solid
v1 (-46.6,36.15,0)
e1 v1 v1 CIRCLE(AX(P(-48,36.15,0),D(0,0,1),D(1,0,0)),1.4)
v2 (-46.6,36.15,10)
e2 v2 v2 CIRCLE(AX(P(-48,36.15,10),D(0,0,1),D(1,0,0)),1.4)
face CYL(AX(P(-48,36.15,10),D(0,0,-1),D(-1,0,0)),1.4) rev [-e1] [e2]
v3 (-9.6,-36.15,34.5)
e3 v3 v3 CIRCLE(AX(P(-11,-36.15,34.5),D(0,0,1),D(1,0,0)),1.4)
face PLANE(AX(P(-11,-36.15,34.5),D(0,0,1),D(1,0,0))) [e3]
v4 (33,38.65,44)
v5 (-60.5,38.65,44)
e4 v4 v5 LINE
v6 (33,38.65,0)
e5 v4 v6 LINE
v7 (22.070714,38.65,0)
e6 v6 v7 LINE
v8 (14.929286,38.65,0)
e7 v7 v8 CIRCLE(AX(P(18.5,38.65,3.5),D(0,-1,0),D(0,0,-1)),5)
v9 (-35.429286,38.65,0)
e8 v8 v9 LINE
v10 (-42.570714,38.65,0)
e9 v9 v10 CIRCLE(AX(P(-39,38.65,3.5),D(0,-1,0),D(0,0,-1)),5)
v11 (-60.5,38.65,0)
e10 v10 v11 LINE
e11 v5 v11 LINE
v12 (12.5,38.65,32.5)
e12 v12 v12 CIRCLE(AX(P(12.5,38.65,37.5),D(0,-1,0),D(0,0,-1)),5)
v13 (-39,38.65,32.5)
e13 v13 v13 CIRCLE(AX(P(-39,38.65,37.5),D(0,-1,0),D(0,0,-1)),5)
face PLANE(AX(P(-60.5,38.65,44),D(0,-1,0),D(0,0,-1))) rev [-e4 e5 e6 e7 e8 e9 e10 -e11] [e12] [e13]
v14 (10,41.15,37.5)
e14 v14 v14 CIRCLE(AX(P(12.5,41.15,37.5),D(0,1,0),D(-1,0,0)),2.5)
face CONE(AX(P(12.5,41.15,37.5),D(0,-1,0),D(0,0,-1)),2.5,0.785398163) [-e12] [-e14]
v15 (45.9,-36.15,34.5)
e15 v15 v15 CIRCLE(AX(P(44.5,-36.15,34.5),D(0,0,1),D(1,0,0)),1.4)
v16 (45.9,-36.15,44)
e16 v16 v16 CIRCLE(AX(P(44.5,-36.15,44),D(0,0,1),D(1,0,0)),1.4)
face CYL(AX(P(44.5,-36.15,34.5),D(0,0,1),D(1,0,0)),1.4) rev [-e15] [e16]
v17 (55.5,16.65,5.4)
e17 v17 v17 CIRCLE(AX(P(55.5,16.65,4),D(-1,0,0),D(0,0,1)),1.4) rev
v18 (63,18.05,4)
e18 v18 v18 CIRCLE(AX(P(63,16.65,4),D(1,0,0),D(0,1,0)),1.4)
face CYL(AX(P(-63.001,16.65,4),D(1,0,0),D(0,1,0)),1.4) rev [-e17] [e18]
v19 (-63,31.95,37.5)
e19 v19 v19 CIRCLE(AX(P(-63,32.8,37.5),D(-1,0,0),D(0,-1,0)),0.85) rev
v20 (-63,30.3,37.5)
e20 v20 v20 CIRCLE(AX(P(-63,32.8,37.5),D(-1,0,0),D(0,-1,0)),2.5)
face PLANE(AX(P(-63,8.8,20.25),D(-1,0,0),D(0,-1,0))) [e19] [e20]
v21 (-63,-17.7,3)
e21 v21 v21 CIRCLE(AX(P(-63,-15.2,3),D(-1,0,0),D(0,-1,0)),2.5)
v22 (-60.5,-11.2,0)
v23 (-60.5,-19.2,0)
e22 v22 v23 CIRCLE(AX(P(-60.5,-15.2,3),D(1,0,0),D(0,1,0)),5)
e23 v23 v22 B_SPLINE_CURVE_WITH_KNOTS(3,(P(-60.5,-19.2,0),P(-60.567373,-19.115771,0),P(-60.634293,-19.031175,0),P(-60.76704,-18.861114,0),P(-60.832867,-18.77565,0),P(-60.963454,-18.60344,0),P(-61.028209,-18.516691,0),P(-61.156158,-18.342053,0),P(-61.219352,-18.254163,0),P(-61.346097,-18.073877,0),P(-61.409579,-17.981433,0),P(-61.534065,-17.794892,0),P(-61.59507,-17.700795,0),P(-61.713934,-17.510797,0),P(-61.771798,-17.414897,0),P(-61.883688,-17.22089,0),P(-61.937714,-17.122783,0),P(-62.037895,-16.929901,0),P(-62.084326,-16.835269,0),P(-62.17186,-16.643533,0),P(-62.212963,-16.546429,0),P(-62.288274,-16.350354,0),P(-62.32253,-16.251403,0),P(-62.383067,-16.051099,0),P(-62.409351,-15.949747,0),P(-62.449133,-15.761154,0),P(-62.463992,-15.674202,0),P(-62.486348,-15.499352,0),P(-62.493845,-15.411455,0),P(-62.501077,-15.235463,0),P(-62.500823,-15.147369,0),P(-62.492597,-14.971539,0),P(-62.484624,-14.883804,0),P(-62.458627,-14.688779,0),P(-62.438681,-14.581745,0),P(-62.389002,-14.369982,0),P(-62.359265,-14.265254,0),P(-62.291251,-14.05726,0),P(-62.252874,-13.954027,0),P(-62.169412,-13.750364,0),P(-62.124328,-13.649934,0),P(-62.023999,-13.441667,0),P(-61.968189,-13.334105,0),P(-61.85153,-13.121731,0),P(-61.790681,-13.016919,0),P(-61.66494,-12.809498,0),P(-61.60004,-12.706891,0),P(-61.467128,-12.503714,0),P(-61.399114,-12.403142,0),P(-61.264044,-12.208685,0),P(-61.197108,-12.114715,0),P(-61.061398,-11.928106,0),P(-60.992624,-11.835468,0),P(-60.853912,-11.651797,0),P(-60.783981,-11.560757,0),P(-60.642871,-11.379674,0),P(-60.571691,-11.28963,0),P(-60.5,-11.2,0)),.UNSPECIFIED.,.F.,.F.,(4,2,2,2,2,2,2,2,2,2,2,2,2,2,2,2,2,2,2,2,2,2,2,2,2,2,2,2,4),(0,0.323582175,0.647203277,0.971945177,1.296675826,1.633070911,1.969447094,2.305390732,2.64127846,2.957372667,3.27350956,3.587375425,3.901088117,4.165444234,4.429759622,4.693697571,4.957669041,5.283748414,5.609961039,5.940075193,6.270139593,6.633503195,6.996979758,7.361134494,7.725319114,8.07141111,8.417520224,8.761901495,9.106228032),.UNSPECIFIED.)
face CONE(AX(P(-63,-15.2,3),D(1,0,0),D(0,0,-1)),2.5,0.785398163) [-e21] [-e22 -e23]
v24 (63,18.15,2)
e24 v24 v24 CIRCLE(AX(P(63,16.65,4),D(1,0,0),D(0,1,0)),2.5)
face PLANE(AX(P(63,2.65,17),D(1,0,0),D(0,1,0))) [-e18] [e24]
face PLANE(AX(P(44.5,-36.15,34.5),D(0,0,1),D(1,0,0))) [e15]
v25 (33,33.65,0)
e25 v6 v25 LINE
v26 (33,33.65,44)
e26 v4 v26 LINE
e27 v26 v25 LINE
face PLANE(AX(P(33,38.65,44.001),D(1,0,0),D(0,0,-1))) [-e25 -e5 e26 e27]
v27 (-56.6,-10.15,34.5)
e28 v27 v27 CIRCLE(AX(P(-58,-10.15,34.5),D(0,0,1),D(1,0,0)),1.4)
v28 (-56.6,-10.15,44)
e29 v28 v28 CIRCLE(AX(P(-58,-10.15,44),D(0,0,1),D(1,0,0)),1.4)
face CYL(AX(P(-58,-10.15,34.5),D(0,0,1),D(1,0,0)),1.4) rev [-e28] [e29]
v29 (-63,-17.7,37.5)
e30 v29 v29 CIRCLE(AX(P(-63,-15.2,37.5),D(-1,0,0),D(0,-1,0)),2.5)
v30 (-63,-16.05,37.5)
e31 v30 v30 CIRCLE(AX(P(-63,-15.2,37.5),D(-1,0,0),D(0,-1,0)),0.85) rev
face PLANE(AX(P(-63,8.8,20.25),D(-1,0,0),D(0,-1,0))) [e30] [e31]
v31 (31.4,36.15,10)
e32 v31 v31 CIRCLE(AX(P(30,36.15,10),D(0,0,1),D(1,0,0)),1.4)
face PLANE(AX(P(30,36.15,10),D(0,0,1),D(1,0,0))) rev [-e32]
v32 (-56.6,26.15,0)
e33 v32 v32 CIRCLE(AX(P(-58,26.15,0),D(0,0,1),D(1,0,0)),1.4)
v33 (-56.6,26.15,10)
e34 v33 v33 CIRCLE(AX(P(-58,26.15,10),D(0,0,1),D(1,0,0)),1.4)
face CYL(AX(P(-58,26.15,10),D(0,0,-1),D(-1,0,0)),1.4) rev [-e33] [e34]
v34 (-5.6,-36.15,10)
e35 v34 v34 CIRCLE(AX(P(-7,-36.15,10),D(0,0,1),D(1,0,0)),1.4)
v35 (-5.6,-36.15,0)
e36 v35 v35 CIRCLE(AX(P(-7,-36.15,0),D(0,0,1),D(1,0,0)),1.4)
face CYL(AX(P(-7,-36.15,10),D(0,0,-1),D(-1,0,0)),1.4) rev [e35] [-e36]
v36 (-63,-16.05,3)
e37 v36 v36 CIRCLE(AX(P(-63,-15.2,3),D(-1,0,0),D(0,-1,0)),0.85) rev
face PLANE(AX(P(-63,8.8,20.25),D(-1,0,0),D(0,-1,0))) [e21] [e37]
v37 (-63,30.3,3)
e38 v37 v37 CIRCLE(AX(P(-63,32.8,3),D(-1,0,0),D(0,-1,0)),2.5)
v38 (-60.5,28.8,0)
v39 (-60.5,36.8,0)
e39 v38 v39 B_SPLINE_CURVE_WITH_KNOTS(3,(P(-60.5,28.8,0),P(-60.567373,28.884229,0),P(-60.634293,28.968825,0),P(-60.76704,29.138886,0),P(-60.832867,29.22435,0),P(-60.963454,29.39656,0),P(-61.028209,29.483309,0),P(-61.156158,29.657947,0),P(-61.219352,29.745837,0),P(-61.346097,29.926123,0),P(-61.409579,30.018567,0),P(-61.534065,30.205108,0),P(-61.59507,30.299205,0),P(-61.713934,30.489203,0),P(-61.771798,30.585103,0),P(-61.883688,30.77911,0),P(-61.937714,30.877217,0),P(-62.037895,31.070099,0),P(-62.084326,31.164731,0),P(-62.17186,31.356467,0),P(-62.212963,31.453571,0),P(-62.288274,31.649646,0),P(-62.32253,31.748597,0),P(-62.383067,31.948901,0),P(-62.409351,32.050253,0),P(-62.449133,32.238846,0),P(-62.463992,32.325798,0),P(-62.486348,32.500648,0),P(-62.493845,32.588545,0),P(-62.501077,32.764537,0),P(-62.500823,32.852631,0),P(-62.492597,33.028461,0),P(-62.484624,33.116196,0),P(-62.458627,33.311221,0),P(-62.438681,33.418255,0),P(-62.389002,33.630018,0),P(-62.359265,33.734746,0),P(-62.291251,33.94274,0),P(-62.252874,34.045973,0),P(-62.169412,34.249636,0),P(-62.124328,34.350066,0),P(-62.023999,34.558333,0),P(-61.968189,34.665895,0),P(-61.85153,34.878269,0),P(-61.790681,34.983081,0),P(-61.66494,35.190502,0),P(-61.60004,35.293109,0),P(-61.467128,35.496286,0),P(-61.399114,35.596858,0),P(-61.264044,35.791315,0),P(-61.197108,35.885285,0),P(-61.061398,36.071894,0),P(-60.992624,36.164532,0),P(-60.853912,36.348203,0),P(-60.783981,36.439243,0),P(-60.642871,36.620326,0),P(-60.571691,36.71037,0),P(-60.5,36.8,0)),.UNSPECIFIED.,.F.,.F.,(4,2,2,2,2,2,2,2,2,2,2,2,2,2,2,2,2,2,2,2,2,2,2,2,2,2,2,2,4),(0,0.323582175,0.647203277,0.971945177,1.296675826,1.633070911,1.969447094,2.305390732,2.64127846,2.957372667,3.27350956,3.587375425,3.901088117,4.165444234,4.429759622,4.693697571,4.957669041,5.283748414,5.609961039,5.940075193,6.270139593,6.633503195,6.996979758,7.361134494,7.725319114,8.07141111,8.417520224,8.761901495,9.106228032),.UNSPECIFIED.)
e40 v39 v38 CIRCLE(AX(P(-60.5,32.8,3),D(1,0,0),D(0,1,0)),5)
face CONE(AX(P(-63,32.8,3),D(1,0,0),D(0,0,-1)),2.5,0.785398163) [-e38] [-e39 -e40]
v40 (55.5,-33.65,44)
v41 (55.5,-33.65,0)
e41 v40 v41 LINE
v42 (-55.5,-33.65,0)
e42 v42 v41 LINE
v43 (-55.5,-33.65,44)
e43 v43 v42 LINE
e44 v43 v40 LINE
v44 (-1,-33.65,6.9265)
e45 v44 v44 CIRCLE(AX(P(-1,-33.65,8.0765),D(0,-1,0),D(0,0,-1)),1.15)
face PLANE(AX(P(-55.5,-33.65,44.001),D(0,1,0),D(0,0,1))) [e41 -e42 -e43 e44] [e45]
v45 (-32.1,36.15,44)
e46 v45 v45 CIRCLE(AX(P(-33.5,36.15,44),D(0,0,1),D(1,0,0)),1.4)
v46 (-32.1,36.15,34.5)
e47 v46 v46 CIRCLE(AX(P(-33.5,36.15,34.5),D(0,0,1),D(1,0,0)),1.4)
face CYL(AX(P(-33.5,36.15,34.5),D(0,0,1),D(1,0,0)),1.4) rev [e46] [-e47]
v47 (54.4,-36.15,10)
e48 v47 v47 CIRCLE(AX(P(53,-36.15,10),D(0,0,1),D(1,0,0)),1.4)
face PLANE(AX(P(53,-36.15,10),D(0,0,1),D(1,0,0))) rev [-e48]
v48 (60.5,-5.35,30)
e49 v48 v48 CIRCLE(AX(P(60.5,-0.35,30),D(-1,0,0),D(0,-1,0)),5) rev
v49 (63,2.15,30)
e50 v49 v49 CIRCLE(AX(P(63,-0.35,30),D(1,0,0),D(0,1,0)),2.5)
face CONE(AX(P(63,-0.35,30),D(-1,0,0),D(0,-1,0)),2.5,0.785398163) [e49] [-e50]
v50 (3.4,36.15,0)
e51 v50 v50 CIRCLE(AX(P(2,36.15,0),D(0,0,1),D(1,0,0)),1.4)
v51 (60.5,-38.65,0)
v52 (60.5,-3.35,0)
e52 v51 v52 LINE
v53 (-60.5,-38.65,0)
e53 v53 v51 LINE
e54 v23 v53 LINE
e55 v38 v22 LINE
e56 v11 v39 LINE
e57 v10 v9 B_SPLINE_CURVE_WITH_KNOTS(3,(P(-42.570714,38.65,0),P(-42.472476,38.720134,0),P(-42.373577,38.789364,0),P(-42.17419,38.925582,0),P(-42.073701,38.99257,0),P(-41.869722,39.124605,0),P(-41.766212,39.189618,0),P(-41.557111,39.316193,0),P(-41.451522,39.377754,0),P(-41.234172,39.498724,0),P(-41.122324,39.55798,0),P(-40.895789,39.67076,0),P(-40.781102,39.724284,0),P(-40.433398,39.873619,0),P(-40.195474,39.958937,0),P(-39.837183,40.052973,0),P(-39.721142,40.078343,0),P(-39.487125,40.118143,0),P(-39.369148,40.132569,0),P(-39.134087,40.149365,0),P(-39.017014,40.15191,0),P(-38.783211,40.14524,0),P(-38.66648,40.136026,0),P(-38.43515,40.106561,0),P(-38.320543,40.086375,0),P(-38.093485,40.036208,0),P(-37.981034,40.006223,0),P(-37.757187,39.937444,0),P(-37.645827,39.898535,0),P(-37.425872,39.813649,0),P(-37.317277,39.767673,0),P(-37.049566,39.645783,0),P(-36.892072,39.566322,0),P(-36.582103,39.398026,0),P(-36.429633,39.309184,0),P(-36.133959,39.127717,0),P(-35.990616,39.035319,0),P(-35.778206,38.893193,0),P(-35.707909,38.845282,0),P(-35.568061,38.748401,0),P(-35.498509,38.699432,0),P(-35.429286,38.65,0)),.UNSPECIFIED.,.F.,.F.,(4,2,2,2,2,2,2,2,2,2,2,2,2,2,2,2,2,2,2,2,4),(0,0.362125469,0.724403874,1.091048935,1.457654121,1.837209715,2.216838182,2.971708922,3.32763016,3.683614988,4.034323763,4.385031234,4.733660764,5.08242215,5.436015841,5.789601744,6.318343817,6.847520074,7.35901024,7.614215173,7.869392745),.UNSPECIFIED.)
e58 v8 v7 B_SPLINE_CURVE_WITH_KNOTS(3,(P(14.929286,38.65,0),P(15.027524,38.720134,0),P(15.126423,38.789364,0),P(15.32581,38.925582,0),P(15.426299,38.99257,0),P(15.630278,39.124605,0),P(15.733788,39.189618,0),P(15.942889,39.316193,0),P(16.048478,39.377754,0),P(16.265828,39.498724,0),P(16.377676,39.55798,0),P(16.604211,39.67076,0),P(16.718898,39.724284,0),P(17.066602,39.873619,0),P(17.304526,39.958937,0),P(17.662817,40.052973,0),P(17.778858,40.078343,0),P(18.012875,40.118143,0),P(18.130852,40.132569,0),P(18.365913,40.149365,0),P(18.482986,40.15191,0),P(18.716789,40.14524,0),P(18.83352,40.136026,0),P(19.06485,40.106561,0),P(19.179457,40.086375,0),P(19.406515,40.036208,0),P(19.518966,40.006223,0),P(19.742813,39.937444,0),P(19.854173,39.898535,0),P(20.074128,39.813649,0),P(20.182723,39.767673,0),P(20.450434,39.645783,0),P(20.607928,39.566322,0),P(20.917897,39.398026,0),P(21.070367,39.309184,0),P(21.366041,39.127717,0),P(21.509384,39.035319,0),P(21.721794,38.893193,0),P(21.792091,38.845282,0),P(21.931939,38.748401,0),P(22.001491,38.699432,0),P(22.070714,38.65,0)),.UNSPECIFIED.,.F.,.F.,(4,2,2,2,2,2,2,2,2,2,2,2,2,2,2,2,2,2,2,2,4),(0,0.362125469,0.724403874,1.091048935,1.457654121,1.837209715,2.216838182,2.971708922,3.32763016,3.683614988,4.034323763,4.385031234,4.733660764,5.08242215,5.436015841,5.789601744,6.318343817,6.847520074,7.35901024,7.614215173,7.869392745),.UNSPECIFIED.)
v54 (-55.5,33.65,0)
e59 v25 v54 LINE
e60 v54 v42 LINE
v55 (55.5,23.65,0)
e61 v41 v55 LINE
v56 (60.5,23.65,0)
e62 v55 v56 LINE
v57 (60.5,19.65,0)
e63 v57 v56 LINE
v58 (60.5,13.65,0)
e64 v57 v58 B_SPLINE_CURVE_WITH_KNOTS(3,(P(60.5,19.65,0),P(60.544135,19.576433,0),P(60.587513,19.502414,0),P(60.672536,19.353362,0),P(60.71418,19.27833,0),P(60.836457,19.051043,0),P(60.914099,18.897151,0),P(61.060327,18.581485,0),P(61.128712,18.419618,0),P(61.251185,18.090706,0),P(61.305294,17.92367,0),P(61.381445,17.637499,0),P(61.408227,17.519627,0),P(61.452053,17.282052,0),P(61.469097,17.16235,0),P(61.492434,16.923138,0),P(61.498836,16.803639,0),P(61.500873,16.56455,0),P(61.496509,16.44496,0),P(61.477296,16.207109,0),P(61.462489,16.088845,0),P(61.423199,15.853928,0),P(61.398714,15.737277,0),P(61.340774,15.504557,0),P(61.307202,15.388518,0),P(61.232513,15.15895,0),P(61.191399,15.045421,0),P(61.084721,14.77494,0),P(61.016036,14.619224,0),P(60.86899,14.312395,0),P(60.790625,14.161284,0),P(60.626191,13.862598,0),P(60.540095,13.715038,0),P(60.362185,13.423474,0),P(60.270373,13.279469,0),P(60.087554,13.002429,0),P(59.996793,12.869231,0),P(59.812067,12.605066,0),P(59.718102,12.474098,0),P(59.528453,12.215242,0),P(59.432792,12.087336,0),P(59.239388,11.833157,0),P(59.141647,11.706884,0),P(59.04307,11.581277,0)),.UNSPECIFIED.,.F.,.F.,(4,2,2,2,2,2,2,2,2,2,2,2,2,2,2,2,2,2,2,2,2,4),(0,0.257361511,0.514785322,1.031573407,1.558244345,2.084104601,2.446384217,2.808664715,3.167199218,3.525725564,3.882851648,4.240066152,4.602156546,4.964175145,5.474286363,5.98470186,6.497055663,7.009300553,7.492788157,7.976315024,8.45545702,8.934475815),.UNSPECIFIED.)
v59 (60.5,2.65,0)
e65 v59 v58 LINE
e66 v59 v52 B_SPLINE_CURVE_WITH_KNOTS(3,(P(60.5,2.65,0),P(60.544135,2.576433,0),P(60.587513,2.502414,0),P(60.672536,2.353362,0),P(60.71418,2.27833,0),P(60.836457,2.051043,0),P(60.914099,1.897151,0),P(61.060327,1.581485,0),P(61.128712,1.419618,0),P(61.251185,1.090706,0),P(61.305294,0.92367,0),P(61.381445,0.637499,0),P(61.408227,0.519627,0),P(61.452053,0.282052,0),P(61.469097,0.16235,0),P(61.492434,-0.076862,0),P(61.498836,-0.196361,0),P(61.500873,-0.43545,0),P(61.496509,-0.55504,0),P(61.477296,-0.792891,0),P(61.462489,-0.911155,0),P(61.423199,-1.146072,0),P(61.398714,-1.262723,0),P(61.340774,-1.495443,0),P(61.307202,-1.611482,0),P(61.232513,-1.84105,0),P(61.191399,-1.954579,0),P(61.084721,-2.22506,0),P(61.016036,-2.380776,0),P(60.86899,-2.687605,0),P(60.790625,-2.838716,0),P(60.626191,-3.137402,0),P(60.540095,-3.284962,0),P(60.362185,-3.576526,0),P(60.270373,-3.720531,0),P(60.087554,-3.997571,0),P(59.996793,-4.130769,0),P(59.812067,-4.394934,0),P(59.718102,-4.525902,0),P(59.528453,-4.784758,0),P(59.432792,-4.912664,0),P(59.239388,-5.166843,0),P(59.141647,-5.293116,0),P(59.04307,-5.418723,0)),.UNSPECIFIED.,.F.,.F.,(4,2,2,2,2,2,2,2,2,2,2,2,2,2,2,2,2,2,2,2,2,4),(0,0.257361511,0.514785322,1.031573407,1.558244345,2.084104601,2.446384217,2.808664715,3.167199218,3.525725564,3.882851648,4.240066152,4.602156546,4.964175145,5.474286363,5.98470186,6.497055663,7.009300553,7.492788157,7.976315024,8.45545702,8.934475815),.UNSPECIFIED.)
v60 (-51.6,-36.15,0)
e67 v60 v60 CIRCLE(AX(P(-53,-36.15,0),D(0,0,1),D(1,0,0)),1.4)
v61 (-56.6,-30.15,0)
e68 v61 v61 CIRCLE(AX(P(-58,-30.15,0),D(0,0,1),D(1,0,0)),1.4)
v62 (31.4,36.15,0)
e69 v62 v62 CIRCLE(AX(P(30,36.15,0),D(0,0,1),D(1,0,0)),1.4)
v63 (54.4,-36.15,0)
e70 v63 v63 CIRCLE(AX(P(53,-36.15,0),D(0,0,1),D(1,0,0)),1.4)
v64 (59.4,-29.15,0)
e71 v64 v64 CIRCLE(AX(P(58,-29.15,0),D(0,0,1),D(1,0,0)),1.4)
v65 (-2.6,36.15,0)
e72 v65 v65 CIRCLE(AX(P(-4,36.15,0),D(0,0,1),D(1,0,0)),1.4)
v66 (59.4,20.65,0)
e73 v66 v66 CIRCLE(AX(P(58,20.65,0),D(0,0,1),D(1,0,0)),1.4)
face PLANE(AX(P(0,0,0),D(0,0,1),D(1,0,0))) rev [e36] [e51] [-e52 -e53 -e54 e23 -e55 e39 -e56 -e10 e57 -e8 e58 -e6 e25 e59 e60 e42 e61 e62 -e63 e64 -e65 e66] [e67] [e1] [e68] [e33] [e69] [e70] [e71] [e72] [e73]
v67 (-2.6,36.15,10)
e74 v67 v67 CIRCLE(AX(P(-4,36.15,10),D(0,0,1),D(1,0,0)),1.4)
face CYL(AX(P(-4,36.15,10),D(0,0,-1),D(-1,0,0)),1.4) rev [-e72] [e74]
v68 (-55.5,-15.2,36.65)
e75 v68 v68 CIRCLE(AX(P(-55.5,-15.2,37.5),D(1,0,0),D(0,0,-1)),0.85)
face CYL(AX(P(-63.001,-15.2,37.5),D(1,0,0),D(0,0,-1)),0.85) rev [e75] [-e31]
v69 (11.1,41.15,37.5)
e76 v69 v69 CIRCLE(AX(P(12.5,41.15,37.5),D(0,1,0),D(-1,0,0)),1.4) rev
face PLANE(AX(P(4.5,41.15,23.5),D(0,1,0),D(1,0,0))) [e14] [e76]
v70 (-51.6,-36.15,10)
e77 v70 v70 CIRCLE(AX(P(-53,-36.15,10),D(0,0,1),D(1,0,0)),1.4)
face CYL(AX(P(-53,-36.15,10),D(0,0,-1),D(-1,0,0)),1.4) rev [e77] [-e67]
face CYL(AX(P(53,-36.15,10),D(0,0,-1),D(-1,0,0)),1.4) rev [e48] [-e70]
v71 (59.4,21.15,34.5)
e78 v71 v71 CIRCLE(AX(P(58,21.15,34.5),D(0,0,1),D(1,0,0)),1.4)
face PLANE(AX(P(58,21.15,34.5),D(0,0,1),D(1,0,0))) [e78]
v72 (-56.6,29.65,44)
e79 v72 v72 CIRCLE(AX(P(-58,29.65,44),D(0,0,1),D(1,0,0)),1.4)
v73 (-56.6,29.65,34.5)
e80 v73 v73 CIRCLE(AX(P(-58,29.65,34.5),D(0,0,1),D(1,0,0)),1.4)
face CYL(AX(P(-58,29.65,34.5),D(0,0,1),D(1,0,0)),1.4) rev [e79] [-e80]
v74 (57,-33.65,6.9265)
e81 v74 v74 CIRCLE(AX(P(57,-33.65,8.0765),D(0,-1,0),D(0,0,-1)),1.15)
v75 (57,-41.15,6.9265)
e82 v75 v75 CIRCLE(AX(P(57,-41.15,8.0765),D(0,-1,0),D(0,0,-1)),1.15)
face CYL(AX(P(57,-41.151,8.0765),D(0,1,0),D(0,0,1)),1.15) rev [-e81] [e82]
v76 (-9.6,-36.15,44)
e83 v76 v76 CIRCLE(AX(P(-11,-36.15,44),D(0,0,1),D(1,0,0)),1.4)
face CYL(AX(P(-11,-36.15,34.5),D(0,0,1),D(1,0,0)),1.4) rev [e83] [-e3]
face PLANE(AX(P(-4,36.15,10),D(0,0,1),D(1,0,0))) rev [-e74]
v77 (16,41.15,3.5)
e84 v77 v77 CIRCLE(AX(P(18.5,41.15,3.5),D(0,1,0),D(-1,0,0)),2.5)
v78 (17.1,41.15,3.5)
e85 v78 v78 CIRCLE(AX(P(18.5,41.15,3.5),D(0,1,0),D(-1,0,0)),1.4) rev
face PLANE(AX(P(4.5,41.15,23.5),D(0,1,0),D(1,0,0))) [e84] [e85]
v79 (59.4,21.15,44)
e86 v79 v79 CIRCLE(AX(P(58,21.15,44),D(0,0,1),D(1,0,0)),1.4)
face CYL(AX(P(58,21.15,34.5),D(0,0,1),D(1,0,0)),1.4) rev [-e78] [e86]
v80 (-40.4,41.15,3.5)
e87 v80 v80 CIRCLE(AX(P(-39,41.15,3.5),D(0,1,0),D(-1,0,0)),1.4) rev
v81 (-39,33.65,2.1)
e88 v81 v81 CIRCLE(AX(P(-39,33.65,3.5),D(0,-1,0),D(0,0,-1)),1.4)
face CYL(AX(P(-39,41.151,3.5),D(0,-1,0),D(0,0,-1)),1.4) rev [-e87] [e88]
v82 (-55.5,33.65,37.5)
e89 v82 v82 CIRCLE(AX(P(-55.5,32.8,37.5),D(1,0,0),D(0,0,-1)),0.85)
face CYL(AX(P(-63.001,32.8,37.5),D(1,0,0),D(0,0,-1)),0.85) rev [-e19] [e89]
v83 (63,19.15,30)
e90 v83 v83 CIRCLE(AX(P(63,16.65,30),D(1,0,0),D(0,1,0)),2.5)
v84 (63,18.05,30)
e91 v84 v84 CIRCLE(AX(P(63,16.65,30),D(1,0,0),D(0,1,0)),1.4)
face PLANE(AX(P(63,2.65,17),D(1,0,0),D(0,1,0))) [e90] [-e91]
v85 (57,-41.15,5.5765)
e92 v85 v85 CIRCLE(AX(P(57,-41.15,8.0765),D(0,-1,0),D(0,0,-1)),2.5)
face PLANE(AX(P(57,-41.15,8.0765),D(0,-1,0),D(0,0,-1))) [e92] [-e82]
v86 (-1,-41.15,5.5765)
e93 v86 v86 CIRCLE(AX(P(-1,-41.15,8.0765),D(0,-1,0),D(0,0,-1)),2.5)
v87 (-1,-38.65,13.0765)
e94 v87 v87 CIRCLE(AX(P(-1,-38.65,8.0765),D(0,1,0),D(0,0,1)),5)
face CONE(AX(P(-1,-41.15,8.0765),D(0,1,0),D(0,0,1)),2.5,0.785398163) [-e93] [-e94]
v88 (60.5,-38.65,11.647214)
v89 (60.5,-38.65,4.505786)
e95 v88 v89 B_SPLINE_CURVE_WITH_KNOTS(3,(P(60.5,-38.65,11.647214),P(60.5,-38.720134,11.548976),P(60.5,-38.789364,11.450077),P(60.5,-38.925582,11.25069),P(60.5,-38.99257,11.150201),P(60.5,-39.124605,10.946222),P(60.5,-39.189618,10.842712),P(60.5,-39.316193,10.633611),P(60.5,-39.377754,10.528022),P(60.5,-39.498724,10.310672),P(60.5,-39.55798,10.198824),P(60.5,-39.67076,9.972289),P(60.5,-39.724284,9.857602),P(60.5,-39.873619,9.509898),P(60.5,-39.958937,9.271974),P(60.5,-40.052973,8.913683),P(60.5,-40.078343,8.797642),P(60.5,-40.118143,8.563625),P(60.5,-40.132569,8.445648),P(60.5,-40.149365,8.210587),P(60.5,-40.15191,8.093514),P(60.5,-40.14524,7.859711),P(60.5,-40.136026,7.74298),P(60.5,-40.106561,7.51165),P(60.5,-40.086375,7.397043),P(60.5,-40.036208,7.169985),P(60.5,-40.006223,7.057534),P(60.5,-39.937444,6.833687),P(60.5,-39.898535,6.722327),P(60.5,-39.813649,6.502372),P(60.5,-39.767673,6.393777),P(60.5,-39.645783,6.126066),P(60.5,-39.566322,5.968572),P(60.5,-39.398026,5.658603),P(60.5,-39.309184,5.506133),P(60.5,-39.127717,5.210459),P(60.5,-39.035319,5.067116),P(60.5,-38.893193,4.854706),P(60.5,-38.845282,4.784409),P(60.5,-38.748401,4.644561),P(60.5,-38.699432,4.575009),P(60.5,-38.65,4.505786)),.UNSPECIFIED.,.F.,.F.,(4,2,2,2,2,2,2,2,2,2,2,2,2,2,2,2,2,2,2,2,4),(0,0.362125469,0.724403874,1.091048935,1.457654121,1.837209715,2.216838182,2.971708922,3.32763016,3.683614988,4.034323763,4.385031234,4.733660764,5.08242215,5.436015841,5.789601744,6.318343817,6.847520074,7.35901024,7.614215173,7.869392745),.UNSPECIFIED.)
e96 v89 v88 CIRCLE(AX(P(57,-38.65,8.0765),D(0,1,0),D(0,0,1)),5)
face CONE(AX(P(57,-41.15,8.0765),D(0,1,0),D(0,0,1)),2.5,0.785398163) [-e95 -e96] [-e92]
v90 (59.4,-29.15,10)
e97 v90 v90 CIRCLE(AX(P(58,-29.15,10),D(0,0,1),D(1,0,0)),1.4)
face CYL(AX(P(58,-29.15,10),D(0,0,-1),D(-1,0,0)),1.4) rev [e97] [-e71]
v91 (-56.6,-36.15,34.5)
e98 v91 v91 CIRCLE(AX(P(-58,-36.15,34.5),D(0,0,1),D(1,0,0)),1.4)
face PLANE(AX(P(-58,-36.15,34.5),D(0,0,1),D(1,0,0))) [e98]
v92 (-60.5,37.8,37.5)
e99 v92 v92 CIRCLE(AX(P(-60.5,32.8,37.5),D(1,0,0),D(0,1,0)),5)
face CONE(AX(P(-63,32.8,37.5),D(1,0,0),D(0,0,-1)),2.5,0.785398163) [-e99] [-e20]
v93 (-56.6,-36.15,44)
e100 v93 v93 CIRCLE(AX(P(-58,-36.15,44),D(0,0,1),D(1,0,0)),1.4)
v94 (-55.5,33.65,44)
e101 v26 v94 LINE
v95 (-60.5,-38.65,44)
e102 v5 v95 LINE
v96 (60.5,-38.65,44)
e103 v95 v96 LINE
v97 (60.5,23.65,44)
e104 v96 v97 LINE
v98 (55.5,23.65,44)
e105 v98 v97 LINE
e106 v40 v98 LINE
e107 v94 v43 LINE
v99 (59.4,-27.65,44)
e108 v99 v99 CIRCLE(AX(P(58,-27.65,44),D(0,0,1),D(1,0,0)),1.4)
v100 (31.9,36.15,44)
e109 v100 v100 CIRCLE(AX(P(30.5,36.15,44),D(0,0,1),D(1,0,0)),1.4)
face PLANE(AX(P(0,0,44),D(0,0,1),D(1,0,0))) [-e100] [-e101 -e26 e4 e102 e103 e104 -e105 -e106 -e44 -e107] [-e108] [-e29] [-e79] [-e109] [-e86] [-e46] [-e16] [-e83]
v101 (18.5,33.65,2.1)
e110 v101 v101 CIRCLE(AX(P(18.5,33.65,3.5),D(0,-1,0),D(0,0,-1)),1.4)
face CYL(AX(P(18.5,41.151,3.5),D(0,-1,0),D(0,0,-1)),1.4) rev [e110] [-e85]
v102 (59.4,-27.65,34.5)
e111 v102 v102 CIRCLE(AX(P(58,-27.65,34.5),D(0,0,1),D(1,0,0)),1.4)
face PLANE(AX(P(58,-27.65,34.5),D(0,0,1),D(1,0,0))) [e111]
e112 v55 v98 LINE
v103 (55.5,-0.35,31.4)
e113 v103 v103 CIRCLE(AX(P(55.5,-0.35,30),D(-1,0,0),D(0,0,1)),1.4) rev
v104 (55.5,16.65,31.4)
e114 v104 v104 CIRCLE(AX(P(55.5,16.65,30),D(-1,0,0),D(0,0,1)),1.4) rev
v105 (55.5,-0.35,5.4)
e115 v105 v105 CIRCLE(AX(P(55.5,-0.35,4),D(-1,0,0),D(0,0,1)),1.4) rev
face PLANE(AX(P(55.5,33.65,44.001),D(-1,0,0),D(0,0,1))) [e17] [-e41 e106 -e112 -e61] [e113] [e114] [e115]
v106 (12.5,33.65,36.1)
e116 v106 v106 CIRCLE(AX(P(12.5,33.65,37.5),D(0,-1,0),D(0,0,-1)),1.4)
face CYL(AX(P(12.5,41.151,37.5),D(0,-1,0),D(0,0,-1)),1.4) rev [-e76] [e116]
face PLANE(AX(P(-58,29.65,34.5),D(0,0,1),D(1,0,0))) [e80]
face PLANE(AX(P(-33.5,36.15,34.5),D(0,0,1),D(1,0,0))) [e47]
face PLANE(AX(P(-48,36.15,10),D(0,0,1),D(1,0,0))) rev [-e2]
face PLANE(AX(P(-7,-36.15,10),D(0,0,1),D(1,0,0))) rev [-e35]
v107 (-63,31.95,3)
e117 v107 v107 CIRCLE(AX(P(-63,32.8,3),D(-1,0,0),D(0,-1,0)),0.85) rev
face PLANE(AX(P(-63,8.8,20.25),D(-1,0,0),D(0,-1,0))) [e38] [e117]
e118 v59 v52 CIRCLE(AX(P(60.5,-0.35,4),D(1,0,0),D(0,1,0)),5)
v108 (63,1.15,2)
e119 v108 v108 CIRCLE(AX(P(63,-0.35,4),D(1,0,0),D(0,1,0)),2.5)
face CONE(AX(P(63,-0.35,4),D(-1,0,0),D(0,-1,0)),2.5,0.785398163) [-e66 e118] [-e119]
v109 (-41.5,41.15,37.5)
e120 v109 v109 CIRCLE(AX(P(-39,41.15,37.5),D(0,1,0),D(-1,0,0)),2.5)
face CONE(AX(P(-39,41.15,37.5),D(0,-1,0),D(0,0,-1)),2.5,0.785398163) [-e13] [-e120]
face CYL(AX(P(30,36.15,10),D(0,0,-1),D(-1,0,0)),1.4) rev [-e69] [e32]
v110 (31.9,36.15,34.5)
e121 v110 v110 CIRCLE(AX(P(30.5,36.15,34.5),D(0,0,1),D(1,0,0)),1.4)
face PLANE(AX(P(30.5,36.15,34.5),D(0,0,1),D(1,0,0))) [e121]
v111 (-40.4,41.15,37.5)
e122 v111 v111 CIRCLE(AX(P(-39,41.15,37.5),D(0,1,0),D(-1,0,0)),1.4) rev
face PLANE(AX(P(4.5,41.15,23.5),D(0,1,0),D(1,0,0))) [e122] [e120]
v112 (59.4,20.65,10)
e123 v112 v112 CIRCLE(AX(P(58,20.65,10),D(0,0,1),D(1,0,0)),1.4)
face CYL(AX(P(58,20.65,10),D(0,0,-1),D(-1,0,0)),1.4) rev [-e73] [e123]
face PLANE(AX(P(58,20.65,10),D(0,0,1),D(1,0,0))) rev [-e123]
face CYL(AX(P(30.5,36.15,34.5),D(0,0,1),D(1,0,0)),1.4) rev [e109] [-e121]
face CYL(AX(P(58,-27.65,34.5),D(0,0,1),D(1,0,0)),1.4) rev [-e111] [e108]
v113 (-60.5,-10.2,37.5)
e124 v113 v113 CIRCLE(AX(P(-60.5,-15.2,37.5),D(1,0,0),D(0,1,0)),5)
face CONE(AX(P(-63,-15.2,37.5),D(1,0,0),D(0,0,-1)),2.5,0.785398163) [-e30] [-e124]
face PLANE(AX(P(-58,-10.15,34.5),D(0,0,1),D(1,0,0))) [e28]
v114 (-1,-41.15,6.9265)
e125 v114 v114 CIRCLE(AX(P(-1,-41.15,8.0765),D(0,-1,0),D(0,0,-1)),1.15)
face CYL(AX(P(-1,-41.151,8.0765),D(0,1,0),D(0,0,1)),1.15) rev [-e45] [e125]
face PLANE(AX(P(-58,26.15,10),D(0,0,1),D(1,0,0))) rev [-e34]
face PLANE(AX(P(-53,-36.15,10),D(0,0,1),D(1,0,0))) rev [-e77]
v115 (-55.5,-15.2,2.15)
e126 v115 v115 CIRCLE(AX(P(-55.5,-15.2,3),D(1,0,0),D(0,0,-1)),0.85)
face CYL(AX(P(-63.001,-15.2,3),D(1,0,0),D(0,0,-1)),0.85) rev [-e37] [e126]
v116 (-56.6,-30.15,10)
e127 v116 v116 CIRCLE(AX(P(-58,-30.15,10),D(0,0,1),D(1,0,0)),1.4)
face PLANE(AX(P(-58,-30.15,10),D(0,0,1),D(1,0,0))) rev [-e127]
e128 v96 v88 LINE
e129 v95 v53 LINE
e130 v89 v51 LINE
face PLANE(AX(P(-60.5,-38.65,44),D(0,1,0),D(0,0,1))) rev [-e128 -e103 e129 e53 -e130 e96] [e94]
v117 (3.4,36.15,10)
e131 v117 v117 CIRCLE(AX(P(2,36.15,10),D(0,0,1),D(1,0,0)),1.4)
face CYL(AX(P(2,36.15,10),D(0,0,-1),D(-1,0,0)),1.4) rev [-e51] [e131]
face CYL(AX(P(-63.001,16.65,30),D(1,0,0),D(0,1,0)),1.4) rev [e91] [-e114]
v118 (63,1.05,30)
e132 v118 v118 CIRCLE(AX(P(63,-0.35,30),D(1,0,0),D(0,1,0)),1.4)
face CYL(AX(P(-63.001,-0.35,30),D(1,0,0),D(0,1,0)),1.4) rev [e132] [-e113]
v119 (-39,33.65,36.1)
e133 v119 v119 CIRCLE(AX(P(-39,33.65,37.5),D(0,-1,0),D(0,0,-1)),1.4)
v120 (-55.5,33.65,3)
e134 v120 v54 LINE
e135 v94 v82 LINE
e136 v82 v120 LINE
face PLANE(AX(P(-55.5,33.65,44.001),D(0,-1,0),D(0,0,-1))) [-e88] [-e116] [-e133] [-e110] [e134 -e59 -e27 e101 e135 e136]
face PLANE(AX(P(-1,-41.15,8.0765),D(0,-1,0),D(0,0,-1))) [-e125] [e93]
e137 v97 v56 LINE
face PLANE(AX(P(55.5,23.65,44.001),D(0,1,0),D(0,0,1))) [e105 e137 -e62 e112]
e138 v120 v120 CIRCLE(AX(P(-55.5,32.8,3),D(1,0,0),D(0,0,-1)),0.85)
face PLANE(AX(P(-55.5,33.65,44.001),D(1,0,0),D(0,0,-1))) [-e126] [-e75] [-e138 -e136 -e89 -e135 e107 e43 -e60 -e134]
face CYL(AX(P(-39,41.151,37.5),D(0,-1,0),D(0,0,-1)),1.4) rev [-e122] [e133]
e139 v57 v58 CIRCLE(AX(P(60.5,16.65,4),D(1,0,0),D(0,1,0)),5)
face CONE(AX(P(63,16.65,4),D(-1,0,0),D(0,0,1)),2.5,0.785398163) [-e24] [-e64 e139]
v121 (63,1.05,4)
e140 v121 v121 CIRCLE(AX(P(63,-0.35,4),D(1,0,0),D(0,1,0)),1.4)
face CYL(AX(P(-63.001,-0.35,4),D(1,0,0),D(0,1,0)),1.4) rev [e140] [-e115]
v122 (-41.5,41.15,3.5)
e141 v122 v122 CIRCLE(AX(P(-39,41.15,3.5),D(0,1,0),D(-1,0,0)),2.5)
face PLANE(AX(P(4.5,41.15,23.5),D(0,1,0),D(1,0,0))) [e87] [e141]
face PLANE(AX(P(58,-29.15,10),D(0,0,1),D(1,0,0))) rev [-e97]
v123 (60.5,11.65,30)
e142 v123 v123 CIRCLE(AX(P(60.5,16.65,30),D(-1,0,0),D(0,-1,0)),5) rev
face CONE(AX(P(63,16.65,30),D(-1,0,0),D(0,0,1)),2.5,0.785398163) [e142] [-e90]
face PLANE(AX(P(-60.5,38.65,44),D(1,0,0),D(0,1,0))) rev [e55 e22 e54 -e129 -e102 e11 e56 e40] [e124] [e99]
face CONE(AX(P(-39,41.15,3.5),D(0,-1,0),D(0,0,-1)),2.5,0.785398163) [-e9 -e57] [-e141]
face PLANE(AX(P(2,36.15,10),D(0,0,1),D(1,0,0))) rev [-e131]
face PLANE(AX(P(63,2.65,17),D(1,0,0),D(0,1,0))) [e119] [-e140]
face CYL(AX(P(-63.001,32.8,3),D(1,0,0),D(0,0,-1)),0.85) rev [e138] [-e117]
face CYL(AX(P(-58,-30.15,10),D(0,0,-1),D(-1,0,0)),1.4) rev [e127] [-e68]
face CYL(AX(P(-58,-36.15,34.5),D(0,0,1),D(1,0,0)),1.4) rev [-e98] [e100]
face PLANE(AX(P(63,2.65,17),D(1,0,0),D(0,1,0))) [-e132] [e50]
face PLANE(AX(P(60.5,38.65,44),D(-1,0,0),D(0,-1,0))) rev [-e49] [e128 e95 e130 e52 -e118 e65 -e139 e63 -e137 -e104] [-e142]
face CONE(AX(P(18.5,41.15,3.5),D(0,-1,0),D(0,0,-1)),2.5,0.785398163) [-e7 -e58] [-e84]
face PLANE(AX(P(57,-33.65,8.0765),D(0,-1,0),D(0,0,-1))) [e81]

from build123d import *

# Parameters (mm, degrees)
SKETCH1_W                  = 121
SKETCH1_H                  = 77.3
BOX_DEPTH                  = 44
CUTOUT_REACH               = 86.203
SKETCH2_W                  = 111
SKETCH2_H                  = 67.3
TRIM_REACH                 = 86.203
SKETCH4_R                  = 1.4
TOP_SCREWS_DEPTH           = 9.5
SKETCH7_R                  = 2.5
USB_POWER_BOSS_DEPTH       = 2.5
CHAMFER2_SIZE              = 2.5
USB_POWER_SCREWS_REACH     = 131.945
SKETCH8_R                  = 0.85
SKETCH9_R                  = 2.5
MOTOR_DRIVERS_BOSS_DEPTH   = 2.5
CHAMFER3_SIZE              = 2.5
MOTOR_DRIVERS_SCREWS_REACH = 107.51
SKETCH11_R                 = 1.4
SKETCH12_R                 = 2.5
BOSS_EXTRUDE5_DEPTH        = 2.5
CUT_EXTRUDE8_REACH         = 109.238
SKETCH13_R                 = 1.15
CHAMFER4_SIZE              = 2.5
SKETCH14_R                 = 1.4
CHASSIS_SCREWS_DEPTH       = 10
SKETCH15_R                 = 5
LDS_ADAPTER_BOARD_DEPTH    = 2.5
CUT_EXTRUDE10_REACH        = 141.661
SKETCH16_R                 = 1.4


with BuildPart() as part:
    # Sketch1 → Box (new body)
    with BuildSketch(Plane.XY):
        Rectangle(SKETCH1_W, SKETCH1_H)
    extrude(amount=BOX_DEPTH)

    # Sketch2 → Cutout (cut, up to next)
    with BuildSketch(Plane.XY, mode=Mode.PRIVATE) as cutout_sk1:
        Rectangle(SKETCH2_W, SKETCH2_H)
    cutout_tool1 = extrude(cutout_sk1.sketch, amount=CUTOUT_REACH, mode=Mode.PRIVATE) & part.part
    add(cutout_tool1.solids().sort_by_distance((0, 0, 0))[0], mode=Mode.SUBTRACT)

    # Sketch3 → Trim (cut, up to next)
    with BuildSketch(Plane.XY, mode=Mode.PRIVATE) as trim_sk1:
        Polygon((33, 38.65), (33, 33.65), (55.5, 23.65), (60.5, 23.65), (60.5, 38.65), align=None)
    trim_tool1 = extrude(trim_sk1.sketch, amount=TRIM_REACH, mode=Mode.PRIVATE) & part.part
    add(trim_tool1.solids().sort_by_distance((49.09375, 32.7125, 0))[0], mode=Mode.SUBTRACT)

    # Sketch4 → Top screws (cut)
    with BuildSketch(Plane.XY.offset(44)):
        with Locations((-58, -36.15)):
            Circle(SKETCH4_R)
        with Locations((58, -27.65)):
            Circle(SKETCH4_R)
        with Locations((-11, -36.15)):
            Circle(SKETCH4_R)
        with Locations((-58, 29.65)):
            Circle(SKETCH4_R)
        with Locations((-33.5, 36.15)):
            Circle(SKETCH4_R)
        with Locations((30.5, 36.15)):
            Circle(SKETCH4_R)
        with Locations((58, 21.15)):
            Circle(SKETCH4_R)
        with Locations((44.5, -36.15)):
            Circle(SKETCH4_R)
        with Locations((-58, -10.15)):
            Circle(SKETCH4_R)
    extrude(amount=-TOP_SCREWS_DEPTH, mode=Mode.SUBTRACT)

    # Sketch7 → USB power boss (add)
    with BuildSketch(Plane.ZY.offset(60.5)):
        with Locations(Location((3, 32.8, 0), (0, 0, 90))):
            Circle(SKETCH7_R)
        with Locations(Location((37.5, 32.8, 0), (0, 0, 90))):
            Circle(SKETCH7_R)
        with Locations(Location((3, -15.2, 0), (0, 0, 90))):
            Circle(SKETCH7_R)
        with Locations(Location((37.5, -15.2, 0), (0, 0, 90))):
            Circle(SKETCH7_R)
    extrude(amount=USB_POWER_BOSS_DEPTH)

    # Chamfer2
    # the kernel refuses this chamfer: 2.5 mm, written as the material it adds along each edge
    with BuildSketch(Plane(origin=(-60.5, 32.8, 3), x_dir=(0, 1, 0), z_dir=(0, 0, 1))) as chamfer2_piece_1_section:
        Polygon((2.5 + CHAMFER2_SIZE, 0), (2.5, CHAMFER2_SIZE), (2.5, 0), align=None)
    chamfer2_piece_1 = revolve(axis=Axis((-60.5, 32.8, 3), (-1, 0, 0)), mode=Mode.PRIVATE)
    chamfer2_piece_1 = split(chamfer2_piece_1, bisect_by=Plane(origin=(-60.5, 32.8, 0), z_dir=(0, 0, 1)), keep=Keep.TOP, mode=Mode.PRIVATE)
    chamfer2_piece_1 = split(chamfer2_piece_1, bisect_by=Plane(origin=(-63, 32.8, 3), z_dir=(1, 0, 0)), keep=Keep.TOP, mode=Mode.PRIVATE)
    add(chamfer2_piece_1)
    with BuildSketch(Plane(origin=(-60.5, 32.8, 37.5), x_dir=(0, 1, 0), z_dir=(0, 0, 1))) as chamfer2_piece_2_section:
        Polygon((2.5 + CHAMFER2_SIZE, 0), (2.5, CHAMFER2_SIZE), (2.5, 0), align=None)
    chamfer2_piece_2 = revolve(axis=Axis((-60.5, 32.8, 37.5), (-1, 0, 0)), mode=Mode.PRIVATE)
    chamfer2_piece_2 = split(chamfer2_piece_2, bisect_by=Plane(origin=(-63, 32.8, 37.5), z_dir=(1, 0, 0)), keep=Keep.TOP, mode=Mode.PRIVATE)
    add(chamfer2_piece_2)
    with BuildSketch(Plane(origin=(-60.5, -15.2, 3), x_dir=(0, 1, 0), z_dir=(0, 0, 1))) as chamfer2_piece_3_section:
        Polygon((2.5 + CHAMFER2_SIZE, 0), (2.5, CHAMFER2_SIZE), (2.5, 0), align=None)
    chamfer2_piece_3 = revolve(axis=Axis((-60.5, -15.2, 3), (-1, 0, 0)), mode=Mode.PRIVATE)
    chamfer2_piece_3 = split(chamfer2_piece_3, bisect_by=Plane(origin=(-60.5, -15.2, 0), z_dir=(0, 0, 1)), keep=Keep.TOP, mode=Mode.PRIVATE)
    chamfer2_piece_3 = split(chamfer2_piece_3, bisect_by=Plane(origin=(-63, -15.2, 3), z_dir=(1, 0, 0)), keep=Keep.TOP, mode=Mode.PRIVATE)
    add(chamfer2_piece_3)
    with BuildSketch(Plane(origin=(-60.5, -15.2, 37.5), x_dir=(0, 1, 0), z_dir=(0, 0, 1))) as chamfer2_piece_4_section:
        Polygon((2.5 + CHAMFER2_SIZE, 0), (2.5, CHAMFER2_SIZE), (2.5, 0), align=None)
    chamfer2_piece_4 = revolve(axis=Axis((-60.5, -15.2, 37.5), (-1, 0, 0)), mode=Mode.PRIVATE)
    chamfer2_piece_4 = split(chamfer2_piece_4, bisect_by=Plane(origin=(-63, -15.2, 37.5), z_dir=(1, 0, 0)), keep=Keep.TOP, mode=Mode.PRIVATE)
    add(chamfer2_piece_4)

    # Sketch8 → USB power screws (cut, up to next)
    with BuildSketch(Plane(origin=(-55.5, 0, 0), x_dir=(0, 0, -1), z_dir=(1, 0, 0)), mode=Mode.PRIVATE) as usb_power_screws_sk1:
        with Locations((-3, -15.2)):
            Circle(SKETCH8_R)
    usb_power_screws_tool1 = extrude(usb_power_screws_sk1.sketch, amount=-USB_POWER_SCREWS_REACH, mode=Mode.PRIVATE) & part.part
    # Sketch8 → USB power screws (cut, up to next)
    with BuildSketch(Plane(origin=(-55.5, 0, 0), x_dir=(0, 0, -1), z_dir=(1, 0, 0)), mode=Mode.PRIVATE) as usb_power_screws_sk2:
        with Locations((-37.5, -15.2)):
            Circle(SKETCH8_R)
    usb_power_screws_tool2 = extrude(usb_power_screws_sk2.sketch, amount=-USB_POWER_SCREWS_REACH, mode=Mode.PRIVATE) & part.part
    # Sketch8 → USB power screws (cut, up to next)
    with BuildSketch(Plane(origin=(-55.5, 0, 0), x_dir=(0, 0, -1), z_dir=(1, 0, 0)), mode=Mode.PRIVATE) as usb_power_screws_sk3:
        with Locations(Location((-3, 32.8, 0), (0, 0, 90))):
            Circle(SKETCH8_R)
    usb_power_screws_tool3 = extrude(usb_power_screws_sk3.sketch, amount=-USB_POWER_SCREWS_REACH, mode=Mode.PRIVATE) & part.part
    # Sketch8 → USB power screws (cut, up to next)
    with BuildSketch(Plane(origin=(-55.5, 0, 0), x_dir=(0, 0, -1), z_dir=(1, 0, 0)), mode=Mode.PRIVATE) as usb_power_screws_sk4:
        with Locations(Location((-37.5, 32.8, 0), (0, 0, 90))):
            Circle(SKETCH8_R)
    usb_power_screws_tool4 = extrude(usb_power_screws_sk4.sketch, amount=-USB_POWER_SCREWS_REACH, mode=Mode.PRIVATE) & part.part
    add(usb_power_screws_tool1.solids().sort_by_distance((-55.5, -15.2, 3))[0], mode=Mode.SUBTRACT)
    add(usb_power_screws_tool2.solids().sort_by_distance((-55.5, -15.2, 37.5))[0], mode=Mode.SUBTRACT)
    add(usb_power_screws_tool3.solids().sort_by_distance((-55.5, 32.8, 3))[0], mode=Mode.SUBTRACT)
    add(usb_power_screws_tool4.solids().sort_by_distance((-55.5, 32.8, 37.5))[0], mode=Mode.SUBTRACT)

    # Sketch9 → Motor drivers boss (add)
    with BuildSketch(Plane(origin=(0, 38.65, 0), x_dir=(1, 0, 0), z_dir=(0, 1, 0))):
        with Locations(Location((-39, -37.5, 0), (0, 0, 90))):
            Circle(SKETCH9_R)
        with Locations(Location((-39, -3.5, 0), (0, 0, 90))):
            Circle(SKETCH9_R)
        with Locations(Location((18.5, -3.5, 0), (0, 0, 90))):
            Circle(SKETCH9_R)
        with Locations(Location((12.5, -37.5, 0), (0, 0, 90))):
            Circle(SKETCH9_R)
    extrude(amount=MOTOR_DRIVERS_BOSS_DEPTH)

    # Chamfer3
    # the kernel refuses this chamfer: 2.5 mm, written as the material it adds along each edge
    with BuildSketch(Plane(origin=(-39, 38.65, 37.5), x_dir=(0, 0, -1), z_dir=(1, 0, 0))) as chamfer3_piece_1_section:
        Polygon((2.5 + CHAMFER3_SIZE, 0), (2.5, CHAMFER3_SIZE), (2.5, 0), align=None)
    chamfer3_piece_1 = revolve(axis=Axis((-39, 38.65, 37.5), (0, 1, 0)), mode=Mode.PRIVATE)
    chamfer3_piece_1 = split(chamfer3_piece_1, bisect_by=Plane(origin=(-39, 41.15, 37.5), z_dir=(0, -1, 0)), keep=Keep.TOP, mode=Mode.PRIVATE)
    add(chamfer3_piece_1)
    with BuildSketch(Plane(origin=(-39, 38.65, 3.5), x_dir=(0, 0, -1), z_dir=(1, 0, 0))) as chamfer3_piece_2_section:
        Polygon((2.5 + CHAMFER3_SIZE, 0), (2.5, CHAMFER3_SIZE), (2.5, 0), align=None)
    chamfer3_piece_2 = revolve(axis=Axis((-39, 38.65, 3.5), (0, 1, 0)), mode=Mode.PRIVATE)
    chamfer3_piece_2 = split(chamfer3_piece_2, bisect_by=Plane(origin=(-39, 38.65, 0), z_dir=(0, 0, 1)), keep=Keep.TOP, mode=Mode.PRIVATE)
    chamfer3_piece_2 = split(chamfer3_piece_2, bisect_by=Plane(origin=(-39, 41.15, 3.5), z_dir=(0, -1, 0)), keep=Keep.TOP, mode=Mode.PRIVATE)
    add(chamfer3_piece_2)
    with BuildSketch(Plane(origin=(18.5, 38.65, 3.5), x_dir=(0, 0, -1), z_dir=(1, 0, 0))) as chamfer3_piece_3_section:
        Polygon((2.5 + CHAMFER3_SIZE, 0), (2.5, CHAMFER3_SIZE), (2.5, 0), align=None)
    chamfer3_piece_3 = revolve(axis=Axis((18.5, 38.65, 3.5), (0, 1, 0)), mode=Mode.PRIVATE)
    chamfer3_piece_3 = split(chamfer3_piece_3, bisect_by=Plane(origin=(18.5, 38.65, 0), z_dir=(0, 0, 1)), keep=Keep.TOP, mode=Mode.PRIVATE)
    chamfer3_piece_3 = split(chamfer3_piece_3, bisect_by=Plane(origin=(18.5, 41.15, 3.5), z_dir=(0, -1, 0)), keep=Keep.TOP, mode=Mode.PRIVATE)
    add(chamfer3_piece_3)
    with BuildSketch(Plane(origin=(12.5, 38.65, 37.5), x_dir=(0, 0, -1), z_dir=(1, 0, 0))) as chamfer3_piece_4_section:
        Polygon((2.5 + CHAMFER3_SIZE, 0), (2.5, CHAMFER3_SIZE), (2.5, 0), align=None)
    chamfer3_piece_4 = revolve(axis=Axis((12.5, 38.65, 37.5), (0, 1, 0)), mode=Mode.PRIVATE)
    chamfer3_piece_4 = split(chamfer3_piece_4, bisect_by=Plane(origin=(12.5, 41.15, 37.5), z_dir=(0, -1, 0)), keep=Keep.TOP, mode=Mode.PRIVATE)
    add(chamfer3_piece_4)

    # Sketch11 → Motor drivers screws (cut, up to next)
    with BuildSketch(Plane.XZ.offset(-33.65), mode=Mode.PRIVATE) as motor_drivers_screws_sk1:
        with Locations(Location((12.5, 37.5, 0), (0, 0, 270))):
            Circle(SKETCH11_R)
    motor_drivers_screws_tool1 = extrude(motor_drivers_screws_sk1.sketch, amount=-MOTOR_DRIVERS_SCREWS_REACH, mode=Mode.PRIVATE) & part.part
    # Sketch11 → Motor drivers screws (cut, up to next)
    with BuildSketch(Plane.XZ.offset(-33.65), mode=Mode.PRIVATE) as motor_drivers_screws_sk2:
        with Locations(Location((18.5, 3.5, 0), (0, 0, 270))):
            Circle(SKETCH11_R)
    motor_drivers_screws_tool2 = extrude(motor_drivers_screws_sk2.sketch, amount=-MOTOR_DRIVERS_SCREWS_REACH, mode=Mode.PRIVATE) & part.part
    # Sketch11 → Motor drivers screws (cut, up to next)
    with BuildSketch(Plane.XZ.offset(-33.65), mode=Mode.PRIVATE) as motor_drivers_screws_sk3:
        with Locations(Location((-39, 3.5, 0), (0, 0, 270))):
            Circle(SKETCH11_R)
    motor_drivers_screws_tool3 = extrude(motor_drivers_screws_sk3.sketch, amount=-MOTOR_DRIVERS_SCREWS_REACH, mode=Mode.PRIVATE) & part.part
    # Sketch11 → Motor drivers screws (cut, up to next)
    with BuildSketch(Plane.XZ.offset(-33.65), mode=Mode.PRIVATE) as motor_drivers_screws_sk4:
        with Locations(Location((-39, 37.5, 0), (0, 0, 270))):
            Circle(SKETCH11_R)
    motor_drivers_screws_tool4 = extrude(motor_drivers_screws_sk4.sketch, amount=-MOTOR_DRIVERS_SCREWS_REACH, mode=Mode.PRIVATE) & part.part
    add(motor_drivers_screws_tool1.solids().sort_by_distance((12.5, 33.65, 37.5))[0], mode=Mode.SUBTRACT)
    add(motor_drivers_screws_tool2.solids().sort_by_distance((18.5, 33.65, 3.5))[0], mode=Mode.SUBTRACT)
    add(motor_drivers_screws_tool3.solids().sort_by_distance((-39, 33.65, 3.5))[0], mode=Mode.SUBTRACT)
    add(motor_drivers_screws_tool4.solids().sort_by_distance((-39, 33.65, 37.5))[0], mode=Mode.SUBTRACT)

    # Sketch12 → Boss-Extrude5 (add)
    with BuildSketch(Plane.XZ.offset(38.65)):
        with Locations(Location((-1, 8.0765, 0), (0, 0, 90))):
            Circle(SKETCH12_R)
        with Locations(Location((57, 8.0765, 0), (0, 0, 90))):
            Circle(SKETCH12_R)
    extrude(amount=BOSS_EXTRUDE5_DEPTH)

    # Sketch13 → Cut-Extrude8 (cut, up to next)
    with BuildSketch(Plane.XZ.offset(33.65), mode=Mode.PRIVATE) as cut_extrude8_sk1:
        with Locations(Location((-1, 8.0765, 0), (0, 0, 270))):
            Circle(SKETCH13_R)
    cut_extrude8_tool1 = extrude(cut_extrude8_sk1.sketch, amount=CUT_EXTRUDE8_REACH, mode=Mode.PRIVATE) & part.part
    # Sketch13 → Cut-Extrude8 (cut, up to next)
    with BuildSketch(Plane.XZ.offset(33.65), mode=Mode.PRIVATE) as cut_extrude8_sk2:
        with Locations(Location((57, 8.0765, 0), (0, 0, 270))):
            Circle(SKETCH13_R)
    cut_extrude8_tool2 = extrude(cut_extrude8_sk2.sketch, amount=CUT_EXTRUDE8_REACH, mode=Mode.PRIVATE) & part.part
    add(cut_extrude8_tool1.solids().sort_by_distance((-1, -33.65, 8.0765))[0], mode=Mode.SUBTRACT)
    add(cut_extrude8_tool2.solids().sort_by_distance((57, -33.65, 8.0765))[0], mode=Mode.SUBTRACT)

    # Chamfer4
    # the kernel refuses this chamfer: 2.5 mm, written as the material it adds along each edge
    with BuildSketch(Plane(origin=(-1, -38.65, 8.0765), x_dir=(0, 0, 1), z_dir=(1, 0, 0))) as chamfer4_piece_1_section:
        Polygon((2.5 + CHAMFER4_SIZE, 0), (2.5, CHAMFER4_SIZE), (2.5, 0), align=None)
    chamfer4_piece_1 = revolve(axis=Axis((-1, -38.65, 8.0765), (0, -1, 0)), mode=Mode.PRIVATE)
    chamfer4_piece_1 = split(chamfer4_piece_1, bisect_by=Plane(origin=(-1, -41.15, 8.0765), z_dir=(0, 1, 0)), keep=Keep.TOP, mode=Mode.PRIVATE)
    add(chamfer4_piece_1)
    with BuildSketch(Plane(origin=(57, -38.65, 8.0765), x_dir=(0, 0, 1), z_dir=(1, 0, 0))) as chamfer4_piece_2_section:
        Polygon((2.5 + CHAMFER4_SIZE, 0), (2.5, CHAMFER4_SIZE), (2.5, 0), align=None)
    chamfer4_piece_2 = revolve(axis=Axis((57, -38.65, 8.0765), (0, -1, 0)), mode=Mode.PRIVATE)
    chamfer4_piece_2 = split(chamfer4_piece_2, bisect_by=Plane(origin=(60.5, -38.65, 8.0765), z_dir=(-1, 0, 0)), keep=Keep.TOP, mode=Mode.PRIVATE)
    chamfer4_piece_2 = split(chamfer4_piece_2, bisect_by=Plane(origin=(57, -41.15, 8.0765), z_dir=(0, 1, 0)), keep=Keep.TOP, mode=Mode.PRIVATE)
    add(chamfer4_piece_2)

    # Sketch14 → Chassis screws (cut)
    with BuildSketch(Plane.XY):
        with Locations((53, -36.15)):
            Circle(SKETCH14_R)
        with Locations((58, -29.15)):
            Circle(SKETCH14_R)
        with Locations((58, 20.65)):
            Circle(SKETCH14_R)
        with Locations((30, 36.15)):
            Circle(SKETCH14_R)
        with Locations((2, 36.15)):
            Circle(SKETCH14_R)
        with Locations((-4, 36.15)):
            Circle(SKETCH14_R)
        with Locations((-48, 36.15)):
            Circle(SKETCH14_R)
        with Locations((-58, 26.15)):
            Circle(SKETCH14_R)
        with Locations((-58, -30.15)):
            Circle(SKETCH14_R)
        with Locations((-53, -36.15)):
            Circle(SKETCH14_R)
        with Locations((-7, -36.15)):
            Circle(SKETCH14_R)
    extrude(amount=CHASSIS_SCREWS_DEPTH, mode=Mode.SUBTRACT)

    # Sketch15 → LDS adapter board (add)
    with BuildSketch(Plane(origin=(60.5, 0, 0), x_dir=(0, 0, -1), z_dir=(1, 0, 0))):
        with Locations(Location((-30, -0.35, 0), (0, 0, 270))):
            Circle(SKETCH15_R)
        with Locations(Location((-30, 16.65, 0), (0, 0, 270))):
            Circle(SKETCH15_R)
        with BuildLine():
            Line((0, -3.35), (0, 2.65))
            ThreePointArc((0, 2.65), (-9, -0.35), (0, -3.35))
        make_face()
        with BuildLine():
            Line((0, 13.65), (0, 19.65))
            ThreePointArc((0, 19.65), (-9, 16.65), (0, 13.65))
        make_face()
    extrude(amount=LDS_ADAPTER_BOARD_DEPTH)

    # Sketch16 → Cut-Extrude10 (cut, up to next)
    with BuildSketch(Plane(origin=(63, 0, 0), x_dir=(0, 0, -1), z_dir=(1, 0, 0)), mode=Mode.PRIVATE) as cut_extrude10_sk1:
        with Locations(Location((-30, -0.35, 0), (0, 0, 90))):
            Circle(SKETCH16_R)
    cut_extrude10_tool1 = extrude(cut_extrude10_sk1.sketch, amount=-CUT_EXTRUDE10_REACH, mode=Mode.PRIVATE) & part.part
    # Sketch16 → Cut-Extrude10 (cut, up to next)
    with BuildSketch(Plane(origin=(63, 0, 0), x_dir=(0, 0, -1), z_dir=(1, 0, 0)), mode=Mode.PRIVATE) as cut_extrude10_sk2:
        with Locations(Location((-30, 16.65, 0), (0, 0, 90))):
            Circle(SKETCH16_R)
    cut_extrude10_tool2 = extrude(cut_extrude10_sk2.sketch, amount=-CUT_EXTRUDE10_REACH, mode=Mode.PRIVATE) & part.part
    # Sketch16 → Cut-Extrude10 (cut, up to next)
    with BuildSketch(Plane(origin=(63, 0, 0), x_dir=(0, 0, -1), z_dir=(1, 0, 0)), mode=Mode.PRIVATE) as cut_extrude10_sk3:
        with Locations(Location((-4, 16.65, 0), (0, 0, 90))):
            Circle(SKETCH16_R)
    cut_extrude10_tool3 = extrude(cut_extrude10_sk3.sketch, amount=-CUT_EXTRUDE10_REACH, mode=Mode.PRIVATE) & part.part
    # Sketch16 → Cut-Extrude10 (cut, up to next)
    with BuildSketch(Plane(origin=(63, 0, 0), x_dir=(0, 0, -1), z_dir=(1, 0, 0)), mode=Mode.PRIVATE) as cut_extrude10_sk4:
        with Locations(Location((-4, -0.35, 0), (0, 0, 90))):
            Circle(SKETCH16_R)
    cut_extrude10_tool4 = extrude(cut_extrude10_sk4.sketch, amount=-CUT_EXTRUDE10_REACH, mode=Mode.PRIVATE) & part.part
    add(cut_extrude10_tool1.solids().sort_by_distance((63, -0.35, 30))[0], mode=Mode.SUBTRACT)
    add(cut_extrude10_tool2.solids().sort_by_distance((63, 16.65, 30))[0], mode=Mode.SUBTRACT)
    add(cut_extrude10_tool3.solids().sort_by_distance((63, 16.65, 4))[0], mode=Mode.SUBTRACT)
    add(cut_extrude10_tool4.solids().sort_by_distance((63, -0.35, 4))[0], mode=Mode.SUBTRACT)

    # Chamfer5: read off the stored shape, not the designer's step
    # Chamfer5 outline → Chamfer5 (revolve, cut)
    with BuildSketch(Plane(origin=(0, -0.35, 4), x_dir=(0, 1, 0), z_dir=(0, 0, -1))):
        Polygon((5, 63), (2.5, 63), (5, 60.5), align=None)
    revolve(axis=Axis((0, -0.35, 4), (1, 0, 0)), mode=Mode.SUBTRACT)

    # Chamfer5 2 outline → Chamfer5 2 (revolve, cut)
    with BuildSketch(Plane(origin=(0, 16.65, 4), x_dir=(0, 1, 0), z_dir=(0, 0, -1))):
        Polygon((5, 63), (2.5, 63), (5, 60.5), align=None)
    revolve(axis=Axis((0, 16.65, 4), (1, 0, 0)), mode=Mode.SUBTRACT)

    # Chamfer5 3 outline → Chamfer5 3 (revolve, cut)
    with BuildSketch(Plane(origin=(0, 16.65, 30), x_dir=(0, 1, 0), z_dir=(0, 0, -1))):
        Polygon((5, 63), (2.5, 63), (5, 60.5), align=None)
    revolve(axis=Axis((0, 16.65, 30), (1, 0, 0)), mode=Mode.SUBTRACT)

    # Chamfer5 4 outline → Chamfer5 4 (revolve, cut)
    with BuildSketch(Plane(origin=(0, -0.35, 30), x_dir=(0, 1, 0), z_dir=(0, 0, -1))):
        Polygon((5, 63), (2.5, 63), (5, 60.5), align=None)
    revolve(axis=Axis((0, -0.35, 30), (1, 0, 0)), mode=Mode.SUBTRACT)


solid = part.part
